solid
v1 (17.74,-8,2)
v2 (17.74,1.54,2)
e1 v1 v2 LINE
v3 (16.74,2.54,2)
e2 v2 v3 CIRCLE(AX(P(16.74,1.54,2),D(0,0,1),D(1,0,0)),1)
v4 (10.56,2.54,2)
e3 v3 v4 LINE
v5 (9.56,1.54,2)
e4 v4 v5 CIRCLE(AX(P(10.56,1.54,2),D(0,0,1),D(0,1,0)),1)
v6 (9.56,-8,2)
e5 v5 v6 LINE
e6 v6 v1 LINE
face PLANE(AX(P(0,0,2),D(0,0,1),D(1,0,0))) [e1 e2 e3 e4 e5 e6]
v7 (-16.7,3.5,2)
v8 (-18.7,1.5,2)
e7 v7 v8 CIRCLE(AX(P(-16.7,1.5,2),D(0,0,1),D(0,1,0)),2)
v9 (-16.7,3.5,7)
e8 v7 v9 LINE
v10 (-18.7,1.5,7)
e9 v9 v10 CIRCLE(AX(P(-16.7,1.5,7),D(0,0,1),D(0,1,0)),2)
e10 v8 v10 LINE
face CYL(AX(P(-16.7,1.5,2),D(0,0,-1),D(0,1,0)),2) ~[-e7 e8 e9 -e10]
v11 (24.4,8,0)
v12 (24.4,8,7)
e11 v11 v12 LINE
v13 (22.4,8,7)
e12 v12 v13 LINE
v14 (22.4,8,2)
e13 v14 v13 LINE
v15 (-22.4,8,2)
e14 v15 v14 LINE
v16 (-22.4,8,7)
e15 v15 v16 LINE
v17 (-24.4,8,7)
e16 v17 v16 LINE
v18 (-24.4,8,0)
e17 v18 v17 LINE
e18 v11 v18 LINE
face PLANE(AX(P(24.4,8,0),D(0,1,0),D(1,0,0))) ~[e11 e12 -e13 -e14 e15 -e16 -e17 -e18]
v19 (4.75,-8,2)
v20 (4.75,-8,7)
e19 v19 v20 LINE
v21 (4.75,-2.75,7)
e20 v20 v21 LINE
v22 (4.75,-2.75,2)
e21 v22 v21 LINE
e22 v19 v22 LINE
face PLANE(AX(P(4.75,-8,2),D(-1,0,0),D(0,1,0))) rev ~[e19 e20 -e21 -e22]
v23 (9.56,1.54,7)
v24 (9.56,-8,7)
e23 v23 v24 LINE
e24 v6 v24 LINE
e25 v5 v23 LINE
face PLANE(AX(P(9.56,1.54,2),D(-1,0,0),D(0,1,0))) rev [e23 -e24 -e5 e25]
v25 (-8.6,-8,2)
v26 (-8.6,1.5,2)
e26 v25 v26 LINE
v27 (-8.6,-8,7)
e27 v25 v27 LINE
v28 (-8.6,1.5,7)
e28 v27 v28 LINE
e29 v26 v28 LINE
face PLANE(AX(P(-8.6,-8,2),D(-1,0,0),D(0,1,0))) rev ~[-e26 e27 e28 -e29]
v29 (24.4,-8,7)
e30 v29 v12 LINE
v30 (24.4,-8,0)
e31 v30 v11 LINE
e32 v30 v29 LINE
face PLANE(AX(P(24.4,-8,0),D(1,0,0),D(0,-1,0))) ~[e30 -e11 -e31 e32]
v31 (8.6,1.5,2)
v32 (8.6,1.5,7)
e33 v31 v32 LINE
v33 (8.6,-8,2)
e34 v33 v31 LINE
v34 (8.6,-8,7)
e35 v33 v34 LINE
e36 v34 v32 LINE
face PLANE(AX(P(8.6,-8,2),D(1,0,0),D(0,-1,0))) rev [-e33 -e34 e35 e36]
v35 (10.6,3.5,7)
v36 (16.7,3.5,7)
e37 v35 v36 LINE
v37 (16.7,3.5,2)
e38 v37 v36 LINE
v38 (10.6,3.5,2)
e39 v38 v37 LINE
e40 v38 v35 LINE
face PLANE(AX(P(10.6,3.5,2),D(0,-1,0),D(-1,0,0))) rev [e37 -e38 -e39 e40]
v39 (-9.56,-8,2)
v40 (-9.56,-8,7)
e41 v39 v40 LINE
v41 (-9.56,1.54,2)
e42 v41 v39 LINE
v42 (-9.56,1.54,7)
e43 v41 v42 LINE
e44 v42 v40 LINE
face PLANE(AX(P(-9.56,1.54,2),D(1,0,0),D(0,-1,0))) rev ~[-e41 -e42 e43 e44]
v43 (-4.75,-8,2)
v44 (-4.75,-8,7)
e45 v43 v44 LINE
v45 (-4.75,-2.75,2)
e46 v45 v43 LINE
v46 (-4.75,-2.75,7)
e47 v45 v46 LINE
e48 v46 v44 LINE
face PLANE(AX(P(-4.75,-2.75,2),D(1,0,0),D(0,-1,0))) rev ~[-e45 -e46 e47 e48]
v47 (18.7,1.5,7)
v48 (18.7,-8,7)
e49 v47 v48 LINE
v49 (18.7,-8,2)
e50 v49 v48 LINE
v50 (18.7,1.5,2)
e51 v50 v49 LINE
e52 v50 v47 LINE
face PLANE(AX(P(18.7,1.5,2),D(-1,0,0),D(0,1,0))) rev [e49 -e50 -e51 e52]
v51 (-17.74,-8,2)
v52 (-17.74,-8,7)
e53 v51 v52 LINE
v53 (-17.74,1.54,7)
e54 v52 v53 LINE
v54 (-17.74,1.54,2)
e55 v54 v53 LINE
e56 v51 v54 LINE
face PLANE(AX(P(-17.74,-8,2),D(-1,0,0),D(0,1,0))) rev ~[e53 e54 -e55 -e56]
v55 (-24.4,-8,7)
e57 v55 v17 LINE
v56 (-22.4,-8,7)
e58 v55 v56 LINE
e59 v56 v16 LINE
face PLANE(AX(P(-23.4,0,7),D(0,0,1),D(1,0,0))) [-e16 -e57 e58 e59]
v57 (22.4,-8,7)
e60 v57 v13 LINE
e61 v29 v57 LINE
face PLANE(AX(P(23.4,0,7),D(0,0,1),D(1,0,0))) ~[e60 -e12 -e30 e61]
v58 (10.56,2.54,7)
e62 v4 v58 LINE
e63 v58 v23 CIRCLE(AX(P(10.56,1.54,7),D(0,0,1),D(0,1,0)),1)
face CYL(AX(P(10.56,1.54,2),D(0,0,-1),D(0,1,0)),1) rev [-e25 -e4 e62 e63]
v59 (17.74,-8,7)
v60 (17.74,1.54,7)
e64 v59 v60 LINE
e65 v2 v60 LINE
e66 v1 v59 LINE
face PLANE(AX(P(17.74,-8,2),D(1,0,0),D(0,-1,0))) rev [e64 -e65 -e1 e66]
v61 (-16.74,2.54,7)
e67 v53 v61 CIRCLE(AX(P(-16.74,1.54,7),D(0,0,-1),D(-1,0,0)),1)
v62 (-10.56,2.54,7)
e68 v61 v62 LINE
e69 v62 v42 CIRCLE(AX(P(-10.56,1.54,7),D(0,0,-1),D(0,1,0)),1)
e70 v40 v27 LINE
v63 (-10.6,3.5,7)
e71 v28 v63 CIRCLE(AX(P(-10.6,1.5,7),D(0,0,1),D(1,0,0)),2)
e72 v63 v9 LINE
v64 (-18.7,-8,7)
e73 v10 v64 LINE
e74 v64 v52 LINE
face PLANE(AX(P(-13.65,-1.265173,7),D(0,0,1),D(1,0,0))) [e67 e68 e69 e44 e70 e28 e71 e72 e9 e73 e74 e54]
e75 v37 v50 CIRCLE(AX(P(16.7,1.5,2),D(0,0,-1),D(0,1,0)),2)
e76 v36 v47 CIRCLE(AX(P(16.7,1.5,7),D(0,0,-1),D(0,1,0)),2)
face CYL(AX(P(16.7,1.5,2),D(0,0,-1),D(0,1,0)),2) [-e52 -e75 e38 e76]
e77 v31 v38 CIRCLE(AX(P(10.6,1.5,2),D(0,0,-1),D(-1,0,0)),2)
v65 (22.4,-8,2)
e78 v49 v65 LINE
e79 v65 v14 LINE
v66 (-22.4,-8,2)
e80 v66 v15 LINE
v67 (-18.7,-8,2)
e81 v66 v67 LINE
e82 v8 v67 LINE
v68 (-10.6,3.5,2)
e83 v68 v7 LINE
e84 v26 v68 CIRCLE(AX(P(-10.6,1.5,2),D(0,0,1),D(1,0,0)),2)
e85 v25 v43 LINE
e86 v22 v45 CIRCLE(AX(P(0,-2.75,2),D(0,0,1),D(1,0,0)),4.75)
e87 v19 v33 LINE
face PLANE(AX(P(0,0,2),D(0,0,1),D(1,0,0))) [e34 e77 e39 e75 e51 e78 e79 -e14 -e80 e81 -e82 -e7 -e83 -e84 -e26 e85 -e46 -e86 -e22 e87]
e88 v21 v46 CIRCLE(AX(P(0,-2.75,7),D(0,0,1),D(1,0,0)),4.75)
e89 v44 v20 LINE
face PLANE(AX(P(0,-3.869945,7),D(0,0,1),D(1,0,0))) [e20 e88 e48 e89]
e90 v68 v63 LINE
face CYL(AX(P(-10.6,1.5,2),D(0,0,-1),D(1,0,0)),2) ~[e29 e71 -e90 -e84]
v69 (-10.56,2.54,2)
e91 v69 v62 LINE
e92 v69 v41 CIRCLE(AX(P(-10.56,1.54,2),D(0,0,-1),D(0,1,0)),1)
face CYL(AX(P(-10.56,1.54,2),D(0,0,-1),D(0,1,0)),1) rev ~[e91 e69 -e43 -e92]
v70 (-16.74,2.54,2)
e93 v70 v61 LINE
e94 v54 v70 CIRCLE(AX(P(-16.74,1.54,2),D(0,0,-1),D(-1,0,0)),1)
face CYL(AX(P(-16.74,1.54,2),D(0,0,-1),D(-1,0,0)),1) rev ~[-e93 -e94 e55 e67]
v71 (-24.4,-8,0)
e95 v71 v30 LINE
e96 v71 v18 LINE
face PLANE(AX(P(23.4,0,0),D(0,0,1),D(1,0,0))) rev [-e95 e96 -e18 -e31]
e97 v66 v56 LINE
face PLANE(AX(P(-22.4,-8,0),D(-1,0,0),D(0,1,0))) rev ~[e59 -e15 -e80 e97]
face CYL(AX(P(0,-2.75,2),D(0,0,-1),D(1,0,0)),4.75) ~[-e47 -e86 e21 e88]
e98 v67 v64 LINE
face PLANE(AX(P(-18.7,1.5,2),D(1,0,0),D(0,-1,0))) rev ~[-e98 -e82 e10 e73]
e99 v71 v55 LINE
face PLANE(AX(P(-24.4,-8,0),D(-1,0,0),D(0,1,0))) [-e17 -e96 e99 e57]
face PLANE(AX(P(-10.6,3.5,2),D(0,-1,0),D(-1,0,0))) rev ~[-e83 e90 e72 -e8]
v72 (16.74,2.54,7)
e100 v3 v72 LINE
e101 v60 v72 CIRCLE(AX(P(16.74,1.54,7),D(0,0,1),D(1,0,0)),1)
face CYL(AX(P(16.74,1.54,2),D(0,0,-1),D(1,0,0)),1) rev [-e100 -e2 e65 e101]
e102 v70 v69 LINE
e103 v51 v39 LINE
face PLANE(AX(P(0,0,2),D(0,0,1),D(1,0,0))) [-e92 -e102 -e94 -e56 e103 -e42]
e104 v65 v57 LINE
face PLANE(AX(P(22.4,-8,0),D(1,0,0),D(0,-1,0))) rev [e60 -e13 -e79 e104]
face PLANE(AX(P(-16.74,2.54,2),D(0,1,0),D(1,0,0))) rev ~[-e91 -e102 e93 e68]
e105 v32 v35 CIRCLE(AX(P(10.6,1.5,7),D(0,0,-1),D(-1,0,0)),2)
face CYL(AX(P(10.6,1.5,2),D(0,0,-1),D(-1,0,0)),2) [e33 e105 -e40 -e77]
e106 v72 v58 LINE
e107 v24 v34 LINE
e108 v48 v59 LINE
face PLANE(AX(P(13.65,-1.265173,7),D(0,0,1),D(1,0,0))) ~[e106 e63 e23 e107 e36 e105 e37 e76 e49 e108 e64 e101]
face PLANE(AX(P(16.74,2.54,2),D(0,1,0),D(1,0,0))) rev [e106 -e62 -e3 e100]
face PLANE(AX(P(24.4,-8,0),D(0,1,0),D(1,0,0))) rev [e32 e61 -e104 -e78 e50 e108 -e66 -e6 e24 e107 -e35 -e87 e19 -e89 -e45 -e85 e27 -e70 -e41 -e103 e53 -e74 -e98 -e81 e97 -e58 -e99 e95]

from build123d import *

# Parameters (mm, degrees)
F0_W     = 44.8
F0_H     = 16
F1_DEPTH = 2
F4_DEPTH = 5
F5_DEPTH = 5
F6_W     = 2
F6_H     = 16
F7_DEPTH = 7


# Not quite as in the source:
# - a pattern or mirror of a feature is missing from the dataset's text; its kind, count and spacing are read off the source's solid


with BuildPart() as f1:
    # F0 (on Top) → F1 (new body)
    with BuildSketch(Plane.XY):
        Rectangle(F0_W, F0_H)
    extrude(amount=F1_DEPTH)

    # F2 (on face) → F4 (join)
    with BuildSketch(Plane.XY.offset(2)):
        with BuildLine():
            Line((-18.7, 1.5), (-18.7, -8))
            Line((-18.7, -8), (-17.74, -8))
            Line((-17.74, -8), (-17.74, 1.54))
            ThreePointArc((-17.74, 1.54), (-17.4471067812, 2.2471067812), (-16.74, 2.54))
            Line((-16.74, 2.54), (-10.56, 2.54))
            ThreePointArc((-10.56, 2.54), (-9.8528932188, 2.2471067812), (-9.56, 1.54))
            Line((-9.56, 1.54), (-9.56, -8))
            Line((-9.56, -8), (-8.6, -8))
            Line((-8.6, -8), (-8.6, 1.5))
            ThreePointArc((-8.6, 1.5), (-9.1857864376, 2.9142135624), (-10.6, 3.5))
            Line((-10.6, 3.5), (-16.7, 3.5))
            ThreePointArc((-16.7, 3.5), (-18.1142135624, 2.9142135624), (-18.7, 1.5))
        make_face()
    f4 = extrude(amount=F4_DEPTH)

    # F4_copies: F4 across plane
    add(f4.mirror(Plane(origin=(0, 0, 0), x_dir=(0, 0, 1), z_dir=(1, 0, 0))))

    # F3 (on face) → F5 (join)
    with BuildSketch(Plane.XY.offset(2)):
        with BuildLine():
            Line((4.75, -8), (4.75, -2.75))
            ThreePointArc((4.75, -2.75), (0, 2), (-4.75, -2.75))
            Line((-4.75, -2.75), (-4.75, -8))
            Line((-4.75, -8), (4.75, -8))
        make_face()
    extrude(amount=F5_DEPTH)

    # F6 (on Top) → F7 (join, through all)
    with BuildSketch(Plane.XY):
        with Locations((-23.4, 0)):
            Rectangle(F6_W, F6_H)
    f7 = extrude(amount=F7_DEPTH)

    # F7_copies: F7 across plane
    add(f7.mirror(Plane(origin=(0, 0, 0), x_dir=(0, 0, 1), z_dir=(1, 0, 0))))


solid = f1.part
